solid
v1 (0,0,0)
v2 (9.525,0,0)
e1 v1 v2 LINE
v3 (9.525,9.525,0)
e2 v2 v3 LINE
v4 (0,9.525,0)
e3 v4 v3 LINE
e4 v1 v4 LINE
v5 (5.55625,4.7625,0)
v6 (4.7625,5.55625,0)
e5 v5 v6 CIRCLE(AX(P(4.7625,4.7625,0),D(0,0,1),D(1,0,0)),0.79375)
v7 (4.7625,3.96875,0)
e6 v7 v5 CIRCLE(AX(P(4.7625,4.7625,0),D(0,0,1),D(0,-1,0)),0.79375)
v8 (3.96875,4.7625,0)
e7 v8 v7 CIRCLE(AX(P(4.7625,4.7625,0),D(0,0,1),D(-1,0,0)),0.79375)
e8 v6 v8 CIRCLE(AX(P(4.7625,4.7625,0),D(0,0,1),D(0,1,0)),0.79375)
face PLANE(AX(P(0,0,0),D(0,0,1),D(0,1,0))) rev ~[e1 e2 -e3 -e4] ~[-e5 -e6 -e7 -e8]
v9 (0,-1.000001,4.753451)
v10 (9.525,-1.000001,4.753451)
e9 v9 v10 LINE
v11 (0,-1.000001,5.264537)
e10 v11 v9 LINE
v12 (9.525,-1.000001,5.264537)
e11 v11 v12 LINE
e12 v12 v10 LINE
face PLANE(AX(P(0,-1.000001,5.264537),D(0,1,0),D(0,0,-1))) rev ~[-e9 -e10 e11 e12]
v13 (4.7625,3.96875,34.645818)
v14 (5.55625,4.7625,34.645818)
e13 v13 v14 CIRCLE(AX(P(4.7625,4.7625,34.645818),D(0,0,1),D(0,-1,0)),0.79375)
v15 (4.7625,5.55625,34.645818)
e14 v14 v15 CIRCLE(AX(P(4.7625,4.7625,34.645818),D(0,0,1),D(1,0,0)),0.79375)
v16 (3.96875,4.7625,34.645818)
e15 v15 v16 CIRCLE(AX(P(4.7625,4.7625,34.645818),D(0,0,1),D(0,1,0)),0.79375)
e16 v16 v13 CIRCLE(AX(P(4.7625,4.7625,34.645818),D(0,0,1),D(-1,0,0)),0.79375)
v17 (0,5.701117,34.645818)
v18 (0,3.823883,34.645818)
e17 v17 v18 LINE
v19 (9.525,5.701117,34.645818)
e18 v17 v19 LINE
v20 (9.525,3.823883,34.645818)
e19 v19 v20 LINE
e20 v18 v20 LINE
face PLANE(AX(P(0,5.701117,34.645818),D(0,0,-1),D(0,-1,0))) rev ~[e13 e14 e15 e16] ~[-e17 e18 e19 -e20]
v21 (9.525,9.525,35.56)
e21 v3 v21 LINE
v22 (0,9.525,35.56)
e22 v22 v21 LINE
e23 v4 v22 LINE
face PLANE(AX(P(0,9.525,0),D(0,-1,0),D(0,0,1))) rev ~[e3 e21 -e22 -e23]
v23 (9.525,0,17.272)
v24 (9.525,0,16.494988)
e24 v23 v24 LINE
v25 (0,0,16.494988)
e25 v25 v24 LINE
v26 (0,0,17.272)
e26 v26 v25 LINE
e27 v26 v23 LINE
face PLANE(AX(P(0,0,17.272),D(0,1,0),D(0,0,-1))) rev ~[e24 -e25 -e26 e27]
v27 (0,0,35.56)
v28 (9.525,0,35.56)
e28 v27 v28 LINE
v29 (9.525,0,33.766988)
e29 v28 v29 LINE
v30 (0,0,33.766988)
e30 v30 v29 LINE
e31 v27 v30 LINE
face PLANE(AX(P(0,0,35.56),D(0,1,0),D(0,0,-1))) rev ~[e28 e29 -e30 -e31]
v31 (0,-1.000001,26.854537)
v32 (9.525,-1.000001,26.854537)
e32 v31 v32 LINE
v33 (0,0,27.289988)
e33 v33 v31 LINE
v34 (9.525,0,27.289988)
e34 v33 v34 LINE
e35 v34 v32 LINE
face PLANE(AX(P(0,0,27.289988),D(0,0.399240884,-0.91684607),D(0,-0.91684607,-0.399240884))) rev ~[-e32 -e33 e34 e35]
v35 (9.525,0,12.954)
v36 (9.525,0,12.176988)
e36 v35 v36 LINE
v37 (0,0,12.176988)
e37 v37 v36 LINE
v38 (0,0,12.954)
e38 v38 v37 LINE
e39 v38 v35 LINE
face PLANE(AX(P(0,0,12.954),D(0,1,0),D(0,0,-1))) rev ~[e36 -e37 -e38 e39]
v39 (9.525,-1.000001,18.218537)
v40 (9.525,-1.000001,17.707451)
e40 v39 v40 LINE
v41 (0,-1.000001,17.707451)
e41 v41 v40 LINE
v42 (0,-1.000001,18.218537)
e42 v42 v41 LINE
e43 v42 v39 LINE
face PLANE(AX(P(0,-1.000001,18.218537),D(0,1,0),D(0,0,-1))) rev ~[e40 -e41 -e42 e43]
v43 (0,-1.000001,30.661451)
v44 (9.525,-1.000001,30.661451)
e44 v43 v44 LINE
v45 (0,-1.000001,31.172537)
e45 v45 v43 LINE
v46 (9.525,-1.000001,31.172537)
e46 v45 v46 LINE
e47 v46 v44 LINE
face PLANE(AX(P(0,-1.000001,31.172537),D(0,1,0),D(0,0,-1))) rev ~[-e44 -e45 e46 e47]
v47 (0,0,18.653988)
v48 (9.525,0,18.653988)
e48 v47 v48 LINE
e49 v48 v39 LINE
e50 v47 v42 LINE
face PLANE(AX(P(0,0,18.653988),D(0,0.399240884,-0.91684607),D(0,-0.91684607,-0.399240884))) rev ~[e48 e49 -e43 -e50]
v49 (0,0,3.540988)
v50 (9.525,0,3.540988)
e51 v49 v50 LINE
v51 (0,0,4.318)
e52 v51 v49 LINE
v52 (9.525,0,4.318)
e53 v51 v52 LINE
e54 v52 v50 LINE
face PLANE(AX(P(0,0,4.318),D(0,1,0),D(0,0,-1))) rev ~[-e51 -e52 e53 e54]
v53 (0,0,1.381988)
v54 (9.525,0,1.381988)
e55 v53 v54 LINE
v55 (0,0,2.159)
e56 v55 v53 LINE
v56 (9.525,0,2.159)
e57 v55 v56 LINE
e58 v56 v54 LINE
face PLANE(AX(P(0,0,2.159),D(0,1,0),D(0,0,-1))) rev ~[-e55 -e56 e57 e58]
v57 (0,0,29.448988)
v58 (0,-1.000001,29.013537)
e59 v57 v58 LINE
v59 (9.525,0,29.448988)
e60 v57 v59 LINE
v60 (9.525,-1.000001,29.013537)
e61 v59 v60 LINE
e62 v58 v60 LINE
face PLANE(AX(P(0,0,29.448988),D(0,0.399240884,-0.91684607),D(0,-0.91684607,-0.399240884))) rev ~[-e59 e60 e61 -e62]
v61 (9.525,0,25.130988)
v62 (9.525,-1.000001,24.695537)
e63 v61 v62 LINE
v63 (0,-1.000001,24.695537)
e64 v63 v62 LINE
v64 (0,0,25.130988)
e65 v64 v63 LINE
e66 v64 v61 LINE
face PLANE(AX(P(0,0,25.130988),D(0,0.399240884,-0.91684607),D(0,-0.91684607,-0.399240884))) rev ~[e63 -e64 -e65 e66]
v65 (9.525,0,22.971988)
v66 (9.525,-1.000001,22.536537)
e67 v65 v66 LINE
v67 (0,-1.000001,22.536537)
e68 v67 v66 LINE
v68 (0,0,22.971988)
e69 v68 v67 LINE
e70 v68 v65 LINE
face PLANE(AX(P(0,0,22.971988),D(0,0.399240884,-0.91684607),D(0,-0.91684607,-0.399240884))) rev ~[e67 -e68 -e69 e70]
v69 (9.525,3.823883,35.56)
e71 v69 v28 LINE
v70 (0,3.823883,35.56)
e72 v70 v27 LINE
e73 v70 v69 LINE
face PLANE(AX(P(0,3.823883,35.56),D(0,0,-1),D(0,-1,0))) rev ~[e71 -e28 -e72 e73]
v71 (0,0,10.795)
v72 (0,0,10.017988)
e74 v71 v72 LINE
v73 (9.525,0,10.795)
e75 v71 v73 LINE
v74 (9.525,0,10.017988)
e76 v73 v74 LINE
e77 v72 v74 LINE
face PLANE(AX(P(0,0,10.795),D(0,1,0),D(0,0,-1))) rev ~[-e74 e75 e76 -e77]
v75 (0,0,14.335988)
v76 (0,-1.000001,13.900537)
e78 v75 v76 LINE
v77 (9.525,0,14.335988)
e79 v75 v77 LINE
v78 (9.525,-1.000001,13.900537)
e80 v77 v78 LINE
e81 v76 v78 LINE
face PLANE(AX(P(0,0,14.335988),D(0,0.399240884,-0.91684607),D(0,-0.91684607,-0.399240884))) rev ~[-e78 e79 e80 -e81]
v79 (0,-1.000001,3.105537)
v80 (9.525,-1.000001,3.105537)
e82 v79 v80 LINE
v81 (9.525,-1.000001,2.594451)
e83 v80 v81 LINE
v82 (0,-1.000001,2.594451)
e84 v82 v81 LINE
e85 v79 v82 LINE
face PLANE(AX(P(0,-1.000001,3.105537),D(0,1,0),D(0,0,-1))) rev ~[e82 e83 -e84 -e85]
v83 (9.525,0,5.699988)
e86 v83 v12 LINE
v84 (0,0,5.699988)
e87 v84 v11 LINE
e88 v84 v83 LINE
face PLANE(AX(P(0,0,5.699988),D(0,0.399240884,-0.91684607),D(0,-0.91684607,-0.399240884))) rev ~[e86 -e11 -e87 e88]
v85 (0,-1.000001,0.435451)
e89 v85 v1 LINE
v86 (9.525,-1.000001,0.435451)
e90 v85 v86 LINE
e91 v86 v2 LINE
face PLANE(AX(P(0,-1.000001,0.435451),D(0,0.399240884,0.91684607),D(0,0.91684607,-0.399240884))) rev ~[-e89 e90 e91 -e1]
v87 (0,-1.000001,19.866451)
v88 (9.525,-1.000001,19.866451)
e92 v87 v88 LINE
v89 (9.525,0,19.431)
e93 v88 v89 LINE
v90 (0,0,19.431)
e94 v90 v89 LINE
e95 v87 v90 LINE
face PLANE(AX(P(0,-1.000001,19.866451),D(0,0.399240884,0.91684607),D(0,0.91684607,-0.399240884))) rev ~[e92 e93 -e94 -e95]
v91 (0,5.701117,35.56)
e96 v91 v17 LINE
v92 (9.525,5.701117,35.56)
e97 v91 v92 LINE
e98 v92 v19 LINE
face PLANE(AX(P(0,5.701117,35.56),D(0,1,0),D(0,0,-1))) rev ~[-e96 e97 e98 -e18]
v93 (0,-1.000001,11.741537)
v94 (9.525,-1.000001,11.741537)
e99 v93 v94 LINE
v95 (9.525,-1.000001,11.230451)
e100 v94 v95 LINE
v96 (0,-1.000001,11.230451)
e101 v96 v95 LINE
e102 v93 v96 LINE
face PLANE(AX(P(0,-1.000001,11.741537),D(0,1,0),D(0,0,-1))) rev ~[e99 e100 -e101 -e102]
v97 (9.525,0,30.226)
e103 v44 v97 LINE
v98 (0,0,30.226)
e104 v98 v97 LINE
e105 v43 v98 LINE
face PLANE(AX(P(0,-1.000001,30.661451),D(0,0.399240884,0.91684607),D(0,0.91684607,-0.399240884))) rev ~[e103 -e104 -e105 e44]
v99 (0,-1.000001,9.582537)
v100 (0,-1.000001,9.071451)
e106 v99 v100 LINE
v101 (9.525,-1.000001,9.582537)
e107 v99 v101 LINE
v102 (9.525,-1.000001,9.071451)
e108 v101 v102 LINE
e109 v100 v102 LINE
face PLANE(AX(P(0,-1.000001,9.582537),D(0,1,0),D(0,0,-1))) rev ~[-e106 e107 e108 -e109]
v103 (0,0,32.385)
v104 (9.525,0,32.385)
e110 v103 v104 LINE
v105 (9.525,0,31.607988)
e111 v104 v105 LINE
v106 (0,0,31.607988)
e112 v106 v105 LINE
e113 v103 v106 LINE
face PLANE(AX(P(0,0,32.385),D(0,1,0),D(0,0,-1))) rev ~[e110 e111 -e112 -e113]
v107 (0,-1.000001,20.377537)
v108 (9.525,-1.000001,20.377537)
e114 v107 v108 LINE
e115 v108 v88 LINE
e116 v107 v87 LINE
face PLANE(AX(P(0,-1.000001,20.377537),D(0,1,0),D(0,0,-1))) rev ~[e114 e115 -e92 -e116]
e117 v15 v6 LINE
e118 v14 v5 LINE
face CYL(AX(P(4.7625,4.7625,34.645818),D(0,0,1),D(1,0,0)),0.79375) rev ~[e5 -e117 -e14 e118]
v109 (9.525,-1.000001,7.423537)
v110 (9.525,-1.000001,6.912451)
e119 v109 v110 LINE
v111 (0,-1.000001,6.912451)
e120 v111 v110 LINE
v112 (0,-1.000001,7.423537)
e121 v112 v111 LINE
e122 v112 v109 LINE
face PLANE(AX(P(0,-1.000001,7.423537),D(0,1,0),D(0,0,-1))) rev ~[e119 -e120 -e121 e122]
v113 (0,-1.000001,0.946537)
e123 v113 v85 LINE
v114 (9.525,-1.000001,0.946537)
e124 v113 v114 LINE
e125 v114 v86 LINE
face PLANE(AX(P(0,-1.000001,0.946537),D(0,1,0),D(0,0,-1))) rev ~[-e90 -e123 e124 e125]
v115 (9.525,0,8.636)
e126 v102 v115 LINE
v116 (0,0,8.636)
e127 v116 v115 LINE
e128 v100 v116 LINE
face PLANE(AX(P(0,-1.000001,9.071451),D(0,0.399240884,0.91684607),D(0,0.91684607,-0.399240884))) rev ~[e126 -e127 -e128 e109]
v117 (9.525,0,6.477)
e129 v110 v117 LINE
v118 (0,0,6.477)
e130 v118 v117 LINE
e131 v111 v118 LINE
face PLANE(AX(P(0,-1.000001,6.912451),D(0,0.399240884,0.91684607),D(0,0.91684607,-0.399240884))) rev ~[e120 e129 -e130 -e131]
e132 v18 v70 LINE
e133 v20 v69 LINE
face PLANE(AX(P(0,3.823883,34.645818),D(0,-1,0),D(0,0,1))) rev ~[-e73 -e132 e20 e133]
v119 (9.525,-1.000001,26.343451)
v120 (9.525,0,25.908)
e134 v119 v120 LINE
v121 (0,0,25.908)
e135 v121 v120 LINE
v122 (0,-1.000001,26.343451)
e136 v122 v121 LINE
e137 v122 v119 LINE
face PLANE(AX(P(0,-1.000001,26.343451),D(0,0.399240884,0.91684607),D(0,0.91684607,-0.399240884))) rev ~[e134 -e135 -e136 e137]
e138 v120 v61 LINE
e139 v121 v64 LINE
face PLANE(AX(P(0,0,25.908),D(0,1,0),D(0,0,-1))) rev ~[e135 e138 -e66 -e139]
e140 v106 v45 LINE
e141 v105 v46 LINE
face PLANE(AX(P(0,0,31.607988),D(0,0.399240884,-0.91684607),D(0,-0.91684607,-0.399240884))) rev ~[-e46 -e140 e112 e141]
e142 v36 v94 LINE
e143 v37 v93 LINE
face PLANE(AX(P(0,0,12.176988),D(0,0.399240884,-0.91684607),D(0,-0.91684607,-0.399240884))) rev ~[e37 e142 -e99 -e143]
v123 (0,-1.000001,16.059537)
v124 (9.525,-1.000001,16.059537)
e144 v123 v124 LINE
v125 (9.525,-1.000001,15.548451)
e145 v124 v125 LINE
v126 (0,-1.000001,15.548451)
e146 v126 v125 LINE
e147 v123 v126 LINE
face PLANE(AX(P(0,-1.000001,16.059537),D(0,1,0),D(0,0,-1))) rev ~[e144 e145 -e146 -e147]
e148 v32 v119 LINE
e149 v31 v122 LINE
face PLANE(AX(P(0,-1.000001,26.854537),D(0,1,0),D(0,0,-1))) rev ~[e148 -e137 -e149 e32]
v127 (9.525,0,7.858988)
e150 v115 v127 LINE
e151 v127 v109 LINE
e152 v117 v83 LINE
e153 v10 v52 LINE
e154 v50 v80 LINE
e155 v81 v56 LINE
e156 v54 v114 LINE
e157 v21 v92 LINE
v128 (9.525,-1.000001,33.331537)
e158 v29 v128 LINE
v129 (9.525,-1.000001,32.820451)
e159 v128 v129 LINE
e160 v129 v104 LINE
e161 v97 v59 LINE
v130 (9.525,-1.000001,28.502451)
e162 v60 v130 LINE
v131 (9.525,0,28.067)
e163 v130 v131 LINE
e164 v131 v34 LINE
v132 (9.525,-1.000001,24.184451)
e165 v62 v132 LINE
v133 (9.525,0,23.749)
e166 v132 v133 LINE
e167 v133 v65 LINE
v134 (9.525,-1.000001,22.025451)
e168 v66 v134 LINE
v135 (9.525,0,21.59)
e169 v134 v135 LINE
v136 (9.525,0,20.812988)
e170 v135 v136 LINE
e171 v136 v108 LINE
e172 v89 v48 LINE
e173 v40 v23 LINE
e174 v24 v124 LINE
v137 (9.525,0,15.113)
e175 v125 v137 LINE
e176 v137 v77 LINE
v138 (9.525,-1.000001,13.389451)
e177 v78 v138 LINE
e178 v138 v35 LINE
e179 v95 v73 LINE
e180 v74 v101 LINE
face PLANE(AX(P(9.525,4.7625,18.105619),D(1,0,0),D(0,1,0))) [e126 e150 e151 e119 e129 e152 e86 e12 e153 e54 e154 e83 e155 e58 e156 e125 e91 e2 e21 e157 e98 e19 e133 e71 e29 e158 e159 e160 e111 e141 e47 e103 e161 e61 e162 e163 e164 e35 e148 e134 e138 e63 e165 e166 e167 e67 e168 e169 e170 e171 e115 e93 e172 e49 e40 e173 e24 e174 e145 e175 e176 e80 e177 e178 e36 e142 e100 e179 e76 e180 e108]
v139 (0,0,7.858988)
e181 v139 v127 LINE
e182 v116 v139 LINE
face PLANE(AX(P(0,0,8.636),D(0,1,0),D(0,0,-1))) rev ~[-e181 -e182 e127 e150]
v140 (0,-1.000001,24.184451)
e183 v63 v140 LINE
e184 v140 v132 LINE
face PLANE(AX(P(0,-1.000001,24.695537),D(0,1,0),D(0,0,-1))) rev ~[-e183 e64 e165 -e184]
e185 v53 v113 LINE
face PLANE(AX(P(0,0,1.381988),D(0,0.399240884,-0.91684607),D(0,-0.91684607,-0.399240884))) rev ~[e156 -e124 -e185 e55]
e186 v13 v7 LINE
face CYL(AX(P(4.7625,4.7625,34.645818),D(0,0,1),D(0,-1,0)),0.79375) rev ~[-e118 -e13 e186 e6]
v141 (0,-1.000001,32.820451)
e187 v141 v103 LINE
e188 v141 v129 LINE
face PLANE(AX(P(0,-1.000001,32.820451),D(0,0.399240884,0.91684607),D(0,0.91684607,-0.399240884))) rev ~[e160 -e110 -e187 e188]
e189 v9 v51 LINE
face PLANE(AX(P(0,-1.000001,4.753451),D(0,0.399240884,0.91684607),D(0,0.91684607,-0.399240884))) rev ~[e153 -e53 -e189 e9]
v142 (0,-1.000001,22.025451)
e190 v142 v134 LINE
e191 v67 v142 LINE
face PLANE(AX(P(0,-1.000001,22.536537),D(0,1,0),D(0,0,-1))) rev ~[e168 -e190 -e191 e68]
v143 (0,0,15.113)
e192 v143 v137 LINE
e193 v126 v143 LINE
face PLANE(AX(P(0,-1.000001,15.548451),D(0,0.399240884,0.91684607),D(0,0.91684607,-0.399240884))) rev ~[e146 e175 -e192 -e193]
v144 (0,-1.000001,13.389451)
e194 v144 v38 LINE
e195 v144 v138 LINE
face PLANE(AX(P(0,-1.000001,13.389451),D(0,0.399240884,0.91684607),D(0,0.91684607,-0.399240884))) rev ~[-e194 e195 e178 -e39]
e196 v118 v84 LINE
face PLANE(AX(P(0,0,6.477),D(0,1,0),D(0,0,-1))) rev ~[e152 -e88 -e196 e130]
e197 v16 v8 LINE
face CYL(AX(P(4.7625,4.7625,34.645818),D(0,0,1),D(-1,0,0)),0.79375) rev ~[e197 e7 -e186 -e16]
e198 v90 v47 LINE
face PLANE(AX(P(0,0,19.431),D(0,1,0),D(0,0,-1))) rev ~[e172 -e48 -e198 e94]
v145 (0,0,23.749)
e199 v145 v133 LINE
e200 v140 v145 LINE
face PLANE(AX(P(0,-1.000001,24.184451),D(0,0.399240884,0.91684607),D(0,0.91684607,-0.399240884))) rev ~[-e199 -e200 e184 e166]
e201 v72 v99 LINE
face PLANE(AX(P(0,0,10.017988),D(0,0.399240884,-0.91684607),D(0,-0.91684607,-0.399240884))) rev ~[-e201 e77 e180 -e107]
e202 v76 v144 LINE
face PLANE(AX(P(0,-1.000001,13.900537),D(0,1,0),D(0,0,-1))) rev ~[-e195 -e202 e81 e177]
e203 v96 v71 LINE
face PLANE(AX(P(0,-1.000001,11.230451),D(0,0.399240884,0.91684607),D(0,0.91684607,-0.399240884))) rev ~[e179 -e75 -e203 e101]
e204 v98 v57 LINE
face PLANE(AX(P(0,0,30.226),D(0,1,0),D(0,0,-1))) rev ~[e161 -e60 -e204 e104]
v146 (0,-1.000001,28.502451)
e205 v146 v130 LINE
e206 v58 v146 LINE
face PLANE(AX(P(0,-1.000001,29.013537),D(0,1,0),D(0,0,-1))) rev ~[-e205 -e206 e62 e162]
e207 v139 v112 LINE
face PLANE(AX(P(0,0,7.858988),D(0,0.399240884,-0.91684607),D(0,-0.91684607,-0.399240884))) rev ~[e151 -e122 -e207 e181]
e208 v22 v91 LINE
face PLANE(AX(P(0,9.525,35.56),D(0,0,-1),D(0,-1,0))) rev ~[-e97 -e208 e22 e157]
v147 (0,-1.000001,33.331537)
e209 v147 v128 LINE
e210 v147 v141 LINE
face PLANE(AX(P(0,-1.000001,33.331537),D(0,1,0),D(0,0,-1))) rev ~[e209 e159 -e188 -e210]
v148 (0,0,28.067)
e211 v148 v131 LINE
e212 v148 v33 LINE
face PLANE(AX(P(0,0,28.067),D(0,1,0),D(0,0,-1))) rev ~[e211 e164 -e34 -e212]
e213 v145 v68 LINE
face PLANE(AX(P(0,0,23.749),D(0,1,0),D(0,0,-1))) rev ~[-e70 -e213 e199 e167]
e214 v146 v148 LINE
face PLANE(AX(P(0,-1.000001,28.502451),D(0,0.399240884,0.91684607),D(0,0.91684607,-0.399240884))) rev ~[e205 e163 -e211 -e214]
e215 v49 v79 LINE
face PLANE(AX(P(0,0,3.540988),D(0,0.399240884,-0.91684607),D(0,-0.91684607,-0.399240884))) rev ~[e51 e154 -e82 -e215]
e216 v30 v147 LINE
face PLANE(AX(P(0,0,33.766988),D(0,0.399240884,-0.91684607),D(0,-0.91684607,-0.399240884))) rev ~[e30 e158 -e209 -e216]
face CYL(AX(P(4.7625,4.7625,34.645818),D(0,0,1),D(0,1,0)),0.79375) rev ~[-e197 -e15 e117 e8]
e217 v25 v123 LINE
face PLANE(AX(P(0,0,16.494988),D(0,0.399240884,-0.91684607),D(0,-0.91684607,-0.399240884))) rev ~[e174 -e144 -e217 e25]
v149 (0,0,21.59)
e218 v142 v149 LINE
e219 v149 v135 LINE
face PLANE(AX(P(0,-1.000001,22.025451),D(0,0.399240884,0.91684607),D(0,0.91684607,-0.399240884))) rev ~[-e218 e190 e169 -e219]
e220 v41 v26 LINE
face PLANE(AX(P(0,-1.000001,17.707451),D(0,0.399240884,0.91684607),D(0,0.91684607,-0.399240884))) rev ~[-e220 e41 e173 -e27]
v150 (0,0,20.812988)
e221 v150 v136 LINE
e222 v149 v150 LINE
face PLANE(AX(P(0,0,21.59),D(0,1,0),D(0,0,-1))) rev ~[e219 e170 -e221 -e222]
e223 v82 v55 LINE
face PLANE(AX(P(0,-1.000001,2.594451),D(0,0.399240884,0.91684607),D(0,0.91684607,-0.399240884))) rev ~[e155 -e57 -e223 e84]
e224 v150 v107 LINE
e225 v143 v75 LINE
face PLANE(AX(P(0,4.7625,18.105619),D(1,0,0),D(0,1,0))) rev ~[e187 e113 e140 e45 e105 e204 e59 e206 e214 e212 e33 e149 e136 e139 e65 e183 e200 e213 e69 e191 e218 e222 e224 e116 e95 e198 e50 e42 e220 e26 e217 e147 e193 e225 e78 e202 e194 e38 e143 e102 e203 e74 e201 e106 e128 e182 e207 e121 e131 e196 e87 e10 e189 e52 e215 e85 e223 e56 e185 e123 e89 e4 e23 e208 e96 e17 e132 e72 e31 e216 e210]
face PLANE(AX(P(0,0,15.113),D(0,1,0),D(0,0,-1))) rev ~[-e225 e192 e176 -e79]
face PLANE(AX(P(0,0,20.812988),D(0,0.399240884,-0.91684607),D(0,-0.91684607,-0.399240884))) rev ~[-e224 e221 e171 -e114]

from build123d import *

# Parameters (mm, degrees)
F1_DEPTH = 9.525
F3_DEPTH = 34.6458181739


# Not quite as in the source:
# - a feature names something its author has since deleted; it is built from what else it names


with BuildPart() as f1:
    # F0 (on Right) → F1 (new body)
    with BuildSketch(Plane.YZ):
        Polygon((0, 1.3819878222), (0, 0), (9.525, 0), (9.525, 35.56), (5.7011166342, 35.56), (5.7011166342, 34.6458181739), (4.7625, 34.6458181739), (3.8238833658, 34.6458181739), (3.8238833658, 35.56), (0, 35.56), (0, 33.7669878222), (0, 32.385), (0, 31.6079878222), (0, 30.226), (0, 29.4489878222), (0, 28.067), (0, 27.2899878222), (0, 25.908), (0, 25.1309878222), (0, 23.749), (0, 22.9719878222), (0, 21.59), (0, 20.8129878222), (0, 19.431), (0, 18.6539878222), (0, 17.272), (0, 16.4949878222), (0, 15.113), (0, 14.3359878222), (0, 12.954), (0, 12.1769878222), (0, 10.795), (0, 10.0179878222), (0, 8.636), (0, 7.8589878222), (0, 6.477), (0, 5.6999878222), (0, 4.318), (0, 3.5409878222), (0, 2.159), align=None)
        Polygon((-1.00000054, 0.4354505218), (0, 0), (0, 1.3819878222), (-1.00000054, 0.9465373005), (-1.00000054, 0.6909939111), align=None)
        Polygon((-1.00000054, 2.5944505218), (0, 2.159), (0, 3.5409878222), (-1.00000054, 3.1055373005), (-1.00000054, 2.8499939111), align=None)
        Polygon((-1.00000054, 4.7534505218), (0, 4.318), (0, 5.6999878222), (-1.00000054, 5.2645373005), (-1.00000054, 5.0089939111), align=None)
        Polygon((-1.00000054, 6.9124505218), (0, 6.477), (0, 7.8589878222), (-1.00000054, 7.4235373005), (-1.00000054, 7.1679939111), align=None)
        Polygon((-1.00000054, 9.0714505218), (0, 8.636), (0, 10.0179878222), (-1.00000054, 9.5825373005), (-1.00000054, 9.3269939111), align=None)
        Polygon((-1.00000054, 11.2304505218), (0, 10.795), (0, 12.1769878222), (-1.00000054, 11.7415373005), (-1.00000054, 11.4859939111), align=None)
        Polygon((-1.00000054, 13.3894505218), (0, 12.954), (0, 14.3359878222), (-1.00000054, 13.9005373005), (-1.00000054, 13.6449939111), align=None)
        Polygon((-1.00000054, 15.5484505218), (0, 15.113), (0, 16.4949878222), (-1.00000054, 16.0595373005), (-1.00000054, 15.8039939111), align=None)
        Polygon((-1.00000054, 17.7074505218), (0, 17.272), (0, 18.6539878222), (-1.00000054, 18.2185373005), (-1.00000054, 17.9629939111), align=None)
        Polygon((-1.00000054, 19.8664505218), (0, 19.431), (0, 20.8129878222), (-1.00000054, 20.3775373005), (-1.00000054, 20.1219939111), align=None)
        Polygon((0, 21.59), (0, 22.9719878222), (-1.00000054, 22.5365373005), (-1.00000054, 22.2809939111), (-1.00000054, 22.0254505218), align=None)
        Polygon((0, 23.749), (0, 25.1309878222), (-1.00000054, 24.6955373005), (-1.00000054, 24.4399939111), (-1.00000054, 24.1844505218), align=None)
        Polygon((0, 25.908), (0, 27.2899878222), (-1.00000054, 26.8545373005), (-1.00000054, 26.5989939111), (-1.00000054, 26.3434505218), align=None)
        Polygon((0, 28.067), (0, 29.4489878222), (-1.00000054, 29.0135373005), (-1.00000054, 28.7579939111), (-1.00000054, 28.5024505218), align=None)
        Polygon((0, 30.226), (0, 31.6079878222), (-1.00000054, 31.1725373005), (-1.00000054, 30.9169939111), (-1.00000054, 30.6614505218), align=None)
        Polygon((0, 32.385), (0, 33.7669878222), (-1.00000054, 33.3315373005), (-1.00000054, 33.0759939111), (-1.00000054, 32.8204505218), align=None)
    extrude(amount=F1_DEPTH)

    # F2 (on face) → F3 (cut, through all)
    with BuildSketch(Plane.XY.offset(34.6458181739)):
        with BuildLine():
            Line((4.7625, 3.96875), (4.7625, 4.7625))
            Line((4.7625, 4.7625), (3.96875, 4.7625))
            ThreePointArc((3.96875, 4.7625), (4.2012339924, 4.2012339924), (4.7625, 3.96875))
        make_face()
        with BuildLine():
            Line((3.96875, 4.7625), (4.7625, 4.7625))
            Line((4.7625, 4.7625), (4.7625, 5.55625))
            ThreePointArc((4.7625, 5.55625), (4.2012339924, 5.3237660076), (3.96875, 4.7625))
        make_face()
        with BuildLine():
            ThreePointArc((4.7625, 3.96875), (5.3237660076, 4.2012339924), (5.55625, 4.7625))
            Line((5.55625, 4.7625), (4.7625, 4.7625))
            Line((4.7625, 4.7625), (4.7625, 3.96875))
        make_face()
        with BuildLine():
            Line((4.7625, 4.7625), (5.55625, 4.7625))
            ThreePointArc((5.55625, 4.7625), (5.3237660076, 5.3237660076), (4.7625, 5.55625))
            Line((4.7625, 5.55625), (4.7625, 4.7625))
        make_face()
    extrude(amount=-F3_DEPTH, mode=Mode.SUBTRACT)


solid = f1.part
